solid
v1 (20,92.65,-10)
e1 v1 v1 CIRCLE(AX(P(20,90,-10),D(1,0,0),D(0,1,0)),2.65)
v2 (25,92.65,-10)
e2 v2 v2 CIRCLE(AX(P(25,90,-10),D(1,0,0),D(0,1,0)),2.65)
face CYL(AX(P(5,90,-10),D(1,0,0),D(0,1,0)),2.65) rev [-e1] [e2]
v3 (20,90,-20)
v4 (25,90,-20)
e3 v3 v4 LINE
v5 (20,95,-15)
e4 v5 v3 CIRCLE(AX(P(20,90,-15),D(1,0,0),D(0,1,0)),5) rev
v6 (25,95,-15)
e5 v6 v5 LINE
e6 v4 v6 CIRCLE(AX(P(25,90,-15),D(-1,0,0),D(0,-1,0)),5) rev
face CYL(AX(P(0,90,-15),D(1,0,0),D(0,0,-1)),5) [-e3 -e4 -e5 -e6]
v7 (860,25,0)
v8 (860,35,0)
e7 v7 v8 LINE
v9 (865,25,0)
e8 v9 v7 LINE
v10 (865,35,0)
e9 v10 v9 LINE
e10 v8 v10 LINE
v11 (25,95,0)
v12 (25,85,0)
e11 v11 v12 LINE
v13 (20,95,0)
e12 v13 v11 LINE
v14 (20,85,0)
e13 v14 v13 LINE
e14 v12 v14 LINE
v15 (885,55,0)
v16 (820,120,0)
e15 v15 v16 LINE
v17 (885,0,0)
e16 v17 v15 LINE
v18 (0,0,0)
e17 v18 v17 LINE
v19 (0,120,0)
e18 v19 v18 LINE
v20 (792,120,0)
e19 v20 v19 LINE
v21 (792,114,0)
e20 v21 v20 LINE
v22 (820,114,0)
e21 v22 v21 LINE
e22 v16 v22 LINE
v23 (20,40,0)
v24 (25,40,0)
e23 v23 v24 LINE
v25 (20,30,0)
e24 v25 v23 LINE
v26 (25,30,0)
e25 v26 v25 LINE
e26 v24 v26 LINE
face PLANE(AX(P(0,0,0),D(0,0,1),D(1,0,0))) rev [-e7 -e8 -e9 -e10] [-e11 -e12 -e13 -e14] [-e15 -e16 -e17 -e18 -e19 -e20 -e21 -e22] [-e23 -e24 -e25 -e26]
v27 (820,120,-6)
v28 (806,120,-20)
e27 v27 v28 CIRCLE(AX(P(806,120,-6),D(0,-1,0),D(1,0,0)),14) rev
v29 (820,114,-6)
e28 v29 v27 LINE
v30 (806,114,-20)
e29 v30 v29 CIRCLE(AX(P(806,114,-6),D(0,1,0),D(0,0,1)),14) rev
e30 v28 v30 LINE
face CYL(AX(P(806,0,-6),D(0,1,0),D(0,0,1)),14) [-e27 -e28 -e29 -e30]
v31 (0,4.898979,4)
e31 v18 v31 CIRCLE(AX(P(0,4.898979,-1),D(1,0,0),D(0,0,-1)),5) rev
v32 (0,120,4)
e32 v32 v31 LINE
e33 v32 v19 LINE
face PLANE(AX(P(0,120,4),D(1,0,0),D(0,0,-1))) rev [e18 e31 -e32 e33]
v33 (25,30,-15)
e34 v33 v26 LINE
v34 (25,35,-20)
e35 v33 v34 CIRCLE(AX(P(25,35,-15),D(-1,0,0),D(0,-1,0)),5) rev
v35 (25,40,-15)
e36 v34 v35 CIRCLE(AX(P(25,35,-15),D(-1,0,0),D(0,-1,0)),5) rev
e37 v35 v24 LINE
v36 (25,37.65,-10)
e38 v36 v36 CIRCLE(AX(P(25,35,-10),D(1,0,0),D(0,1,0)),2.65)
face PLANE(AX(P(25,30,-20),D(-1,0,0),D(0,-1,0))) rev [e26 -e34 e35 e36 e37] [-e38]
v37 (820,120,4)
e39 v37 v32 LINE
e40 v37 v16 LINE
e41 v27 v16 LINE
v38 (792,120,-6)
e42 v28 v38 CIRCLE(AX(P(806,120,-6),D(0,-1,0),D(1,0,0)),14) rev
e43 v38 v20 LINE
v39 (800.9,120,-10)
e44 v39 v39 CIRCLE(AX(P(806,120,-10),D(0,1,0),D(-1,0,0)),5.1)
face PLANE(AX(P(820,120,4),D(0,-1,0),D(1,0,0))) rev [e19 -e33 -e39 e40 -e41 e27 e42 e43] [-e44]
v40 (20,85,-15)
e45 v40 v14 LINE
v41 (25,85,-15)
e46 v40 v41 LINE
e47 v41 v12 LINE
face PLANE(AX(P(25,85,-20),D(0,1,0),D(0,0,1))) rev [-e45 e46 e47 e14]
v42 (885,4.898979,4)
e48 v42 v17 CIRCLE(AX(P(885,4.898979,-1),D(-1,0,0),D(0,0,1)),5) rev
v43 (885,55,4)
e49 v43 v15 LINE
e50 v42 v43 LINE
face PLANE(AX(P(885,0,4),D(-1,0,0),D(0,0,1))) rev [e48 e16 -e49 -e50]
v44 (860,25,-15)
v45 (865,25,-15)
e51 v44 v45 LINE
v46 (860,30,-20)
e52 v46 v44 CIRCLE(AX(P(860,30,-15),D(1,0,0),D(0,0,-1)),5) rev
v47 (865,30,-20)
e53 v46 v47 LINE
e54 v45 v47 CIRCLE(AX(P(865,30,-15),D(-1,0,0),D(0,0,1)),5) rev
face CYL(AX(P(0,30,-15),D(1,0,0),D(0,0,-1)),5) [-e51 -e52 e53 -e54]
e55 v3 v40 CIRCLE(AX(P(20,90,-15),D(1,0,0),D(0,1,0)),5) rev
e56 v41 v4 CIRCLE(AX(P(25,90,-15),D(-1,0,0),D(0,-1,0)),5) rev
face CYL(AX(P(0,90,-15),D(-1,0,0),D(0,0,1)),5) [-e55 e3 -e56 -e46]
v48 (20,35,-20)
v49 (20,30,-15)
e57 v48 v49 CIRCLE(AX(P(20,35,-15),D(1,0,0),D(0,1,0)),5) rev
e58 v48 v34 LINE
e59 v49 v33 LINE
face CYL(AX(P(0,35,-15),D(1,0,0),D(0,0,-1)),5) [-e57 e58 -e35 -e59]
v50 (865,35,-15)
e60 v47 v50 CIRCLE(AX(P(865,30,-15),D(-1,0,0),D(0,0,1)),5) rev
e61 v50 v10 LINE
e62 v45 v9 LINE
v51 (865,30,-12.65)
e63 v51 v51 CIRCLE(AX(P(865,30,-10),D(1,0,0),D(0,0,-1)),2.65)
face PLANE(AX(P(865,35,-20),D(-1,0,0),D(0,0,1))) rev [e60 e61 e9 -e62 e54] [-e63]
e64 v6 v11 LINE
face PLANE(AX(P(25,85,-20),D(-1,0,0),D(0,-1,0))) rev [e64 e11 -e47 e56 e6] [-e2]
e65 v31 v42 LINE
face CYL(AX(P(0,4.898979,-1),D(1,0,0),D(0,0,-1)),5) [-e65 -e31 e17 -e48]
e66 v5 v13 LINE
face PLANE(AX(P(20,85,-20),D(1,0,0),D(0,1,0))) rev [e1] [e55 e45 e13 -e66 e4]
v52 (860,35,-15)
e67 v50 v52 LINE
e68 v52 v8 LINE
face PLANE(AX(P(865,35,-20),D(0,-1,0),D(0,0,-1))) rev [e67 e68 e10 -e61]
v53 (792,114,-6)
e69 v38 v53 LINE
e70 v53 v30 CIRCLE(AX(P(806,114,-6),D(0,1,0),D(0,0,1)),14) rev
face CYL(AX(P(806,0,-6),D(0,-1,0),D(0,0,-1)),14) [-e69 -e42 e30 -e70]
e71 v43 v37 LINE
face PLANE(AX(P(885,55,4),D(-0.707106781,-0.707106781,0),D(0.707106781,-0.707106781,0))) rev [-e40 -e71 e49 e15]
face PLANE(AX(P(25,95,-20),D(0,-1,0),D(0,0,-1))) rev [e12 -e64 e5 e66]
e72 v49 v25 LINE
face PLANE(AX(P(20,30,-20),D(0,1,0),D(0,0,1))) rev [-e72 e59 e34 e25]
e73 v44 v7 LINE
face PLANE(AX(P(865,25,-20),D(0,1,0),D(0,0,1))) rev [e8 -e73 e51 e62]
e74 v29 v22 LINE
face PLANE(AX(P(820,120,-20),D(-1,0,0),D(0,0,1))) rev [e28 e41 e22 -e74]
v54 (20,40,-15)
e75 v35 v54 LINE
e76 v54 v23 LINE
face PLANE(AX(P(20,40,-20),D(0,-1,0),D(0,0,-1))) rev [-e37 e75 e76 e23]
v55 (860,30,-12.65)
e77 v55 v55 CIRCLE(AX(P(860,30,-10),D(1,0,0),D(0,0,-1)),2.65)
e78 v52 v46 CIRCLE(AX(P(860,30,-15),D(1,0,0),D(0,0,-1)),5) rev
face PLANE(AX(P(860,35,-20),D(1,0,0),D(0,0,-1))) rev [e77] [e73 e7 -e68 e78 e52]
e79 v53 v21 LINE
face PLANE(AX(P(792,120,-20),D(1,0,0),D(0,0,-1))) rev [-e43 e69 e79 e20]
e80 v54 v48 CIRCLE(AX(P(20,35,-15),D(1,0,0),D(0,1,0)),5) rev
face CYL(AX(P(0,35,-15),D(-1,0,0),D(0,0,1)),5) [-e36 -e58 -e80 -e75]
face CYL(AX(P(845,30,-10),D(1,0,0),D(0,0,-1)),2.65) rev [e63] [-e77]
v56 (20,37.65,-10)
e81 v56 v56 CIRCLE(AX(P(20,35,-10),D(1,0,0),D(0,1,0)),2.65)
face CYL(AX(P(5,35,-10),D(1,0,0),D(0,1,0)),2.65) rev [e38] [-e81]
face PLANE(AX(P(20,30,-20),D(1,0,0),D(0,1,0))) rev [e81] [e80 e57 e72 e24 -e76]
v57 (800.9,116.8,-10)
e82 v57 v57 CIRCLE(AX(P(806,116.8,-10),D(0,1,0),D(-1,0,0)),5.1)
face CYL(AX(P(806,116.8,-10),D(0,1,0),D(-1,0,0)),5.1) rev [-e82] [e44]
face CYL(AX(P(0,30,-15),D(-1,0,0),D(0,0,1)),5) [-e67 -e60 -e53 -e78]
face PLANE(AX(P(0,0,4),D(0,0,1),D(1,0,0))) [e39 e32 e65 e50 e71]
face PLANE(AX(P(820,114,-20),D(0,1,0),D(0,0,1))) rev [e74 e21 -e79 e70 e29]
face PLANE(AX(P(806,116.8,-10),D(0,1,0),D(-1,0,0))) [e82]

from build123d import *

# Parameters (mm, degrees)
BOSS_EXTRUDE1_DEPTH = 4
SKETCH2_W           = 5
SKETCH2_H           = 10
BOSS_EXTRUDE2_DEPTH = 20
SKETCH3_R           = 2.65
CUT_EXTRUDE1_DEPTH  = 20
FILLET1_R           = 5
SKETCH4_W           = 5
SKETCH4_H           = 10
BOSS_EXTRUDE3_DEPTH = 20
SKETCH5_R           = 2.65
CUT_EXTRUDE2_DEPTH  = 20
FILLET2_R           = 5
SKETCH6_W           = 28
SKETCH6_H           = 6
BOSS_EXTRUDE4_DEPTH = 20
SKETCH7_R           = 5.1
CUT_EXTRUDE3_DEPTH  = 3.2
FILLET3_R           = 14
FILLET4_R           = 5


# Some blends are built 0.0001 mm under size
with BuildPart() as part:
    # Sketch1 → Boss-Extrude1 (new body)
    with BuildSketch(Plane.XY):
        Polygon((0, 0), (885, 0), (885, 55), (820, 120), (0, 120), align=None)
    extrude(amount=BOSS_EXTRUDE1_DEPTH)

    # Sketch2 → Boss-Extrude2 (add)
    with BuildSketch(Plane(origin=(0, 0, 0), x_dir=(-1, 0, 0), z_dir=(0, 0, -1))):
        with Locations((-22.5, 90)):
            Rectangle(SKETCH2_W, SKETCH2_H)
        with Locations((-22.5, 35)):
            Rectangle(SKETCH2_W, SKETCH2_H)
    extrude(amount=BOSS_EXTRUDE2_DEPTH)

    # Sketch3 → Cut-Extrude1 (cut)
    with BuildSketch(Plane(origin=(25, 0, 0), x_dir=(0, 0, -1), z_dir=(1, 0, 0))):
        with Locations(Location((10, 90, 0), (0, 0, 90))):
            Circle(SKETCH3_R)
        with Locations(Location((10, 35, 0), (0, 0, 90))):
            Circle(SKETCH3_R)
    extrude(amount=-CUT_EXTRUDE1_DEPTH, mode=Mode.SUBTRACT)

    # Fillet1
    fillet1_edges = [part.edges().sort_by_distance(p)[0] for p in [
        (22.5, 30, -20),
        (22.5, 40, -20),
        (22.5, 85, -20),
        (22.5, 95, -20),
    ]]
    fillet(fillet1_edges, radius=FILLET1_R - 0.0001)  # a hair under: the kernel refuses the full size

    # Sketch4 → Boss-Extrude3 (add)
    with BuildSketch(Plane(origin=(0, 0, 0), x_dir=(-1, 0, 0), z_dir=(0, 0, -1))):
        with Locations((-862.5, 30)):
            Rectangle(SKETCH4_W, SKETCH4_H)
    extrude(amount=BOSS_EXTRUDE3_DEPTH)

    # Sketch5 → Cut-Extrude2 (cut)
    with BuildSketch(Plane(origin=(865, 0, 0), x_dir=(0, 0, -1), z_dir=(1, 0, 0))):
        with Locations((10, 30)):
            Circle(SKETCH5_R)
    extrude(amount=-CUT_EXTRUDE2_DEPTH, mode=Mode.SUBTRACT)

    # Fillet2
    fillet2_edges = [part.edges().sort_by_distance(p)[0] for p in [
        (862.5, 25, -20),
        (862.5, 35, -20),
    ]]
    fillet(fillet2_edges, radius=FILLET2_R - 0.0001)  # a hair under: the kernel refuses the full size

    # Sketch6 → Boss-Extrude4 (add)
    with BuildSketch(Plane(origin=(0, 0, 0), x_dir=(-1, 0, 0), z_dir=(0, 0, -1))):
        with Locations((-806, 117)):
            Rectangle(SKETCH6_W, SKETCH6_H)
    extrude(amount=BOSS_EXTRUDE4_DEPTH)

    # Sketch7 → Cut-Extrude3 (cut)
    with BuildSketch(Plane(origin=(0, 120, 0), x_dir=(1, 0, 0), z_dir=(0, 1, 0))):
        with Locations(Location((806, 10, 0), (0, 0, 180))):
            Circle(SKETCH7_R)
    extrude(amount=-CUT_EXTRUDE3_DEPTH, mode=Mode.SUBTRACT)

    # Fillet3
    fillet3_edges = [part.edges().sort_by_distance(p)[0] for p in [
        (792, 117, -20),
        (820, 117, -20),
    ]]
    fillet(fillet3_edges, radius=FILLET3_R - 0.0001)  # a hair under: the kernel refuses the full size

    # Fillet4
    # the kernel refuses this fillet: 5 mm, written as the material it takes off along each edge
    with BuildSketch(Plane(origin=(-12.247448714, 0, 4), x_dir=(0, 1, 0), z_dir=(1, 0, 0))) as fillet4_piece_1:
        with BuildLine():
            CenterArc((4.898979486, -5), FILLET4_R, 90, 78.463040967)
            Line((0, -4), (-0.09797959, -3.98))
            ThreePointArc((-0.09797959, -3.98), (-0.1, -2), (-0.1, 0))
            Line((-0.1, 0), (0, 0.1))
            Line((0, 0.1), (4.898979486, 0.1))
            Line((4.898979486, 0.1), (4.898979486, 0))
        make_face()
    extrude(amount=909.494897428, mode=Mode.SUBTRACT)


solid = part.part
